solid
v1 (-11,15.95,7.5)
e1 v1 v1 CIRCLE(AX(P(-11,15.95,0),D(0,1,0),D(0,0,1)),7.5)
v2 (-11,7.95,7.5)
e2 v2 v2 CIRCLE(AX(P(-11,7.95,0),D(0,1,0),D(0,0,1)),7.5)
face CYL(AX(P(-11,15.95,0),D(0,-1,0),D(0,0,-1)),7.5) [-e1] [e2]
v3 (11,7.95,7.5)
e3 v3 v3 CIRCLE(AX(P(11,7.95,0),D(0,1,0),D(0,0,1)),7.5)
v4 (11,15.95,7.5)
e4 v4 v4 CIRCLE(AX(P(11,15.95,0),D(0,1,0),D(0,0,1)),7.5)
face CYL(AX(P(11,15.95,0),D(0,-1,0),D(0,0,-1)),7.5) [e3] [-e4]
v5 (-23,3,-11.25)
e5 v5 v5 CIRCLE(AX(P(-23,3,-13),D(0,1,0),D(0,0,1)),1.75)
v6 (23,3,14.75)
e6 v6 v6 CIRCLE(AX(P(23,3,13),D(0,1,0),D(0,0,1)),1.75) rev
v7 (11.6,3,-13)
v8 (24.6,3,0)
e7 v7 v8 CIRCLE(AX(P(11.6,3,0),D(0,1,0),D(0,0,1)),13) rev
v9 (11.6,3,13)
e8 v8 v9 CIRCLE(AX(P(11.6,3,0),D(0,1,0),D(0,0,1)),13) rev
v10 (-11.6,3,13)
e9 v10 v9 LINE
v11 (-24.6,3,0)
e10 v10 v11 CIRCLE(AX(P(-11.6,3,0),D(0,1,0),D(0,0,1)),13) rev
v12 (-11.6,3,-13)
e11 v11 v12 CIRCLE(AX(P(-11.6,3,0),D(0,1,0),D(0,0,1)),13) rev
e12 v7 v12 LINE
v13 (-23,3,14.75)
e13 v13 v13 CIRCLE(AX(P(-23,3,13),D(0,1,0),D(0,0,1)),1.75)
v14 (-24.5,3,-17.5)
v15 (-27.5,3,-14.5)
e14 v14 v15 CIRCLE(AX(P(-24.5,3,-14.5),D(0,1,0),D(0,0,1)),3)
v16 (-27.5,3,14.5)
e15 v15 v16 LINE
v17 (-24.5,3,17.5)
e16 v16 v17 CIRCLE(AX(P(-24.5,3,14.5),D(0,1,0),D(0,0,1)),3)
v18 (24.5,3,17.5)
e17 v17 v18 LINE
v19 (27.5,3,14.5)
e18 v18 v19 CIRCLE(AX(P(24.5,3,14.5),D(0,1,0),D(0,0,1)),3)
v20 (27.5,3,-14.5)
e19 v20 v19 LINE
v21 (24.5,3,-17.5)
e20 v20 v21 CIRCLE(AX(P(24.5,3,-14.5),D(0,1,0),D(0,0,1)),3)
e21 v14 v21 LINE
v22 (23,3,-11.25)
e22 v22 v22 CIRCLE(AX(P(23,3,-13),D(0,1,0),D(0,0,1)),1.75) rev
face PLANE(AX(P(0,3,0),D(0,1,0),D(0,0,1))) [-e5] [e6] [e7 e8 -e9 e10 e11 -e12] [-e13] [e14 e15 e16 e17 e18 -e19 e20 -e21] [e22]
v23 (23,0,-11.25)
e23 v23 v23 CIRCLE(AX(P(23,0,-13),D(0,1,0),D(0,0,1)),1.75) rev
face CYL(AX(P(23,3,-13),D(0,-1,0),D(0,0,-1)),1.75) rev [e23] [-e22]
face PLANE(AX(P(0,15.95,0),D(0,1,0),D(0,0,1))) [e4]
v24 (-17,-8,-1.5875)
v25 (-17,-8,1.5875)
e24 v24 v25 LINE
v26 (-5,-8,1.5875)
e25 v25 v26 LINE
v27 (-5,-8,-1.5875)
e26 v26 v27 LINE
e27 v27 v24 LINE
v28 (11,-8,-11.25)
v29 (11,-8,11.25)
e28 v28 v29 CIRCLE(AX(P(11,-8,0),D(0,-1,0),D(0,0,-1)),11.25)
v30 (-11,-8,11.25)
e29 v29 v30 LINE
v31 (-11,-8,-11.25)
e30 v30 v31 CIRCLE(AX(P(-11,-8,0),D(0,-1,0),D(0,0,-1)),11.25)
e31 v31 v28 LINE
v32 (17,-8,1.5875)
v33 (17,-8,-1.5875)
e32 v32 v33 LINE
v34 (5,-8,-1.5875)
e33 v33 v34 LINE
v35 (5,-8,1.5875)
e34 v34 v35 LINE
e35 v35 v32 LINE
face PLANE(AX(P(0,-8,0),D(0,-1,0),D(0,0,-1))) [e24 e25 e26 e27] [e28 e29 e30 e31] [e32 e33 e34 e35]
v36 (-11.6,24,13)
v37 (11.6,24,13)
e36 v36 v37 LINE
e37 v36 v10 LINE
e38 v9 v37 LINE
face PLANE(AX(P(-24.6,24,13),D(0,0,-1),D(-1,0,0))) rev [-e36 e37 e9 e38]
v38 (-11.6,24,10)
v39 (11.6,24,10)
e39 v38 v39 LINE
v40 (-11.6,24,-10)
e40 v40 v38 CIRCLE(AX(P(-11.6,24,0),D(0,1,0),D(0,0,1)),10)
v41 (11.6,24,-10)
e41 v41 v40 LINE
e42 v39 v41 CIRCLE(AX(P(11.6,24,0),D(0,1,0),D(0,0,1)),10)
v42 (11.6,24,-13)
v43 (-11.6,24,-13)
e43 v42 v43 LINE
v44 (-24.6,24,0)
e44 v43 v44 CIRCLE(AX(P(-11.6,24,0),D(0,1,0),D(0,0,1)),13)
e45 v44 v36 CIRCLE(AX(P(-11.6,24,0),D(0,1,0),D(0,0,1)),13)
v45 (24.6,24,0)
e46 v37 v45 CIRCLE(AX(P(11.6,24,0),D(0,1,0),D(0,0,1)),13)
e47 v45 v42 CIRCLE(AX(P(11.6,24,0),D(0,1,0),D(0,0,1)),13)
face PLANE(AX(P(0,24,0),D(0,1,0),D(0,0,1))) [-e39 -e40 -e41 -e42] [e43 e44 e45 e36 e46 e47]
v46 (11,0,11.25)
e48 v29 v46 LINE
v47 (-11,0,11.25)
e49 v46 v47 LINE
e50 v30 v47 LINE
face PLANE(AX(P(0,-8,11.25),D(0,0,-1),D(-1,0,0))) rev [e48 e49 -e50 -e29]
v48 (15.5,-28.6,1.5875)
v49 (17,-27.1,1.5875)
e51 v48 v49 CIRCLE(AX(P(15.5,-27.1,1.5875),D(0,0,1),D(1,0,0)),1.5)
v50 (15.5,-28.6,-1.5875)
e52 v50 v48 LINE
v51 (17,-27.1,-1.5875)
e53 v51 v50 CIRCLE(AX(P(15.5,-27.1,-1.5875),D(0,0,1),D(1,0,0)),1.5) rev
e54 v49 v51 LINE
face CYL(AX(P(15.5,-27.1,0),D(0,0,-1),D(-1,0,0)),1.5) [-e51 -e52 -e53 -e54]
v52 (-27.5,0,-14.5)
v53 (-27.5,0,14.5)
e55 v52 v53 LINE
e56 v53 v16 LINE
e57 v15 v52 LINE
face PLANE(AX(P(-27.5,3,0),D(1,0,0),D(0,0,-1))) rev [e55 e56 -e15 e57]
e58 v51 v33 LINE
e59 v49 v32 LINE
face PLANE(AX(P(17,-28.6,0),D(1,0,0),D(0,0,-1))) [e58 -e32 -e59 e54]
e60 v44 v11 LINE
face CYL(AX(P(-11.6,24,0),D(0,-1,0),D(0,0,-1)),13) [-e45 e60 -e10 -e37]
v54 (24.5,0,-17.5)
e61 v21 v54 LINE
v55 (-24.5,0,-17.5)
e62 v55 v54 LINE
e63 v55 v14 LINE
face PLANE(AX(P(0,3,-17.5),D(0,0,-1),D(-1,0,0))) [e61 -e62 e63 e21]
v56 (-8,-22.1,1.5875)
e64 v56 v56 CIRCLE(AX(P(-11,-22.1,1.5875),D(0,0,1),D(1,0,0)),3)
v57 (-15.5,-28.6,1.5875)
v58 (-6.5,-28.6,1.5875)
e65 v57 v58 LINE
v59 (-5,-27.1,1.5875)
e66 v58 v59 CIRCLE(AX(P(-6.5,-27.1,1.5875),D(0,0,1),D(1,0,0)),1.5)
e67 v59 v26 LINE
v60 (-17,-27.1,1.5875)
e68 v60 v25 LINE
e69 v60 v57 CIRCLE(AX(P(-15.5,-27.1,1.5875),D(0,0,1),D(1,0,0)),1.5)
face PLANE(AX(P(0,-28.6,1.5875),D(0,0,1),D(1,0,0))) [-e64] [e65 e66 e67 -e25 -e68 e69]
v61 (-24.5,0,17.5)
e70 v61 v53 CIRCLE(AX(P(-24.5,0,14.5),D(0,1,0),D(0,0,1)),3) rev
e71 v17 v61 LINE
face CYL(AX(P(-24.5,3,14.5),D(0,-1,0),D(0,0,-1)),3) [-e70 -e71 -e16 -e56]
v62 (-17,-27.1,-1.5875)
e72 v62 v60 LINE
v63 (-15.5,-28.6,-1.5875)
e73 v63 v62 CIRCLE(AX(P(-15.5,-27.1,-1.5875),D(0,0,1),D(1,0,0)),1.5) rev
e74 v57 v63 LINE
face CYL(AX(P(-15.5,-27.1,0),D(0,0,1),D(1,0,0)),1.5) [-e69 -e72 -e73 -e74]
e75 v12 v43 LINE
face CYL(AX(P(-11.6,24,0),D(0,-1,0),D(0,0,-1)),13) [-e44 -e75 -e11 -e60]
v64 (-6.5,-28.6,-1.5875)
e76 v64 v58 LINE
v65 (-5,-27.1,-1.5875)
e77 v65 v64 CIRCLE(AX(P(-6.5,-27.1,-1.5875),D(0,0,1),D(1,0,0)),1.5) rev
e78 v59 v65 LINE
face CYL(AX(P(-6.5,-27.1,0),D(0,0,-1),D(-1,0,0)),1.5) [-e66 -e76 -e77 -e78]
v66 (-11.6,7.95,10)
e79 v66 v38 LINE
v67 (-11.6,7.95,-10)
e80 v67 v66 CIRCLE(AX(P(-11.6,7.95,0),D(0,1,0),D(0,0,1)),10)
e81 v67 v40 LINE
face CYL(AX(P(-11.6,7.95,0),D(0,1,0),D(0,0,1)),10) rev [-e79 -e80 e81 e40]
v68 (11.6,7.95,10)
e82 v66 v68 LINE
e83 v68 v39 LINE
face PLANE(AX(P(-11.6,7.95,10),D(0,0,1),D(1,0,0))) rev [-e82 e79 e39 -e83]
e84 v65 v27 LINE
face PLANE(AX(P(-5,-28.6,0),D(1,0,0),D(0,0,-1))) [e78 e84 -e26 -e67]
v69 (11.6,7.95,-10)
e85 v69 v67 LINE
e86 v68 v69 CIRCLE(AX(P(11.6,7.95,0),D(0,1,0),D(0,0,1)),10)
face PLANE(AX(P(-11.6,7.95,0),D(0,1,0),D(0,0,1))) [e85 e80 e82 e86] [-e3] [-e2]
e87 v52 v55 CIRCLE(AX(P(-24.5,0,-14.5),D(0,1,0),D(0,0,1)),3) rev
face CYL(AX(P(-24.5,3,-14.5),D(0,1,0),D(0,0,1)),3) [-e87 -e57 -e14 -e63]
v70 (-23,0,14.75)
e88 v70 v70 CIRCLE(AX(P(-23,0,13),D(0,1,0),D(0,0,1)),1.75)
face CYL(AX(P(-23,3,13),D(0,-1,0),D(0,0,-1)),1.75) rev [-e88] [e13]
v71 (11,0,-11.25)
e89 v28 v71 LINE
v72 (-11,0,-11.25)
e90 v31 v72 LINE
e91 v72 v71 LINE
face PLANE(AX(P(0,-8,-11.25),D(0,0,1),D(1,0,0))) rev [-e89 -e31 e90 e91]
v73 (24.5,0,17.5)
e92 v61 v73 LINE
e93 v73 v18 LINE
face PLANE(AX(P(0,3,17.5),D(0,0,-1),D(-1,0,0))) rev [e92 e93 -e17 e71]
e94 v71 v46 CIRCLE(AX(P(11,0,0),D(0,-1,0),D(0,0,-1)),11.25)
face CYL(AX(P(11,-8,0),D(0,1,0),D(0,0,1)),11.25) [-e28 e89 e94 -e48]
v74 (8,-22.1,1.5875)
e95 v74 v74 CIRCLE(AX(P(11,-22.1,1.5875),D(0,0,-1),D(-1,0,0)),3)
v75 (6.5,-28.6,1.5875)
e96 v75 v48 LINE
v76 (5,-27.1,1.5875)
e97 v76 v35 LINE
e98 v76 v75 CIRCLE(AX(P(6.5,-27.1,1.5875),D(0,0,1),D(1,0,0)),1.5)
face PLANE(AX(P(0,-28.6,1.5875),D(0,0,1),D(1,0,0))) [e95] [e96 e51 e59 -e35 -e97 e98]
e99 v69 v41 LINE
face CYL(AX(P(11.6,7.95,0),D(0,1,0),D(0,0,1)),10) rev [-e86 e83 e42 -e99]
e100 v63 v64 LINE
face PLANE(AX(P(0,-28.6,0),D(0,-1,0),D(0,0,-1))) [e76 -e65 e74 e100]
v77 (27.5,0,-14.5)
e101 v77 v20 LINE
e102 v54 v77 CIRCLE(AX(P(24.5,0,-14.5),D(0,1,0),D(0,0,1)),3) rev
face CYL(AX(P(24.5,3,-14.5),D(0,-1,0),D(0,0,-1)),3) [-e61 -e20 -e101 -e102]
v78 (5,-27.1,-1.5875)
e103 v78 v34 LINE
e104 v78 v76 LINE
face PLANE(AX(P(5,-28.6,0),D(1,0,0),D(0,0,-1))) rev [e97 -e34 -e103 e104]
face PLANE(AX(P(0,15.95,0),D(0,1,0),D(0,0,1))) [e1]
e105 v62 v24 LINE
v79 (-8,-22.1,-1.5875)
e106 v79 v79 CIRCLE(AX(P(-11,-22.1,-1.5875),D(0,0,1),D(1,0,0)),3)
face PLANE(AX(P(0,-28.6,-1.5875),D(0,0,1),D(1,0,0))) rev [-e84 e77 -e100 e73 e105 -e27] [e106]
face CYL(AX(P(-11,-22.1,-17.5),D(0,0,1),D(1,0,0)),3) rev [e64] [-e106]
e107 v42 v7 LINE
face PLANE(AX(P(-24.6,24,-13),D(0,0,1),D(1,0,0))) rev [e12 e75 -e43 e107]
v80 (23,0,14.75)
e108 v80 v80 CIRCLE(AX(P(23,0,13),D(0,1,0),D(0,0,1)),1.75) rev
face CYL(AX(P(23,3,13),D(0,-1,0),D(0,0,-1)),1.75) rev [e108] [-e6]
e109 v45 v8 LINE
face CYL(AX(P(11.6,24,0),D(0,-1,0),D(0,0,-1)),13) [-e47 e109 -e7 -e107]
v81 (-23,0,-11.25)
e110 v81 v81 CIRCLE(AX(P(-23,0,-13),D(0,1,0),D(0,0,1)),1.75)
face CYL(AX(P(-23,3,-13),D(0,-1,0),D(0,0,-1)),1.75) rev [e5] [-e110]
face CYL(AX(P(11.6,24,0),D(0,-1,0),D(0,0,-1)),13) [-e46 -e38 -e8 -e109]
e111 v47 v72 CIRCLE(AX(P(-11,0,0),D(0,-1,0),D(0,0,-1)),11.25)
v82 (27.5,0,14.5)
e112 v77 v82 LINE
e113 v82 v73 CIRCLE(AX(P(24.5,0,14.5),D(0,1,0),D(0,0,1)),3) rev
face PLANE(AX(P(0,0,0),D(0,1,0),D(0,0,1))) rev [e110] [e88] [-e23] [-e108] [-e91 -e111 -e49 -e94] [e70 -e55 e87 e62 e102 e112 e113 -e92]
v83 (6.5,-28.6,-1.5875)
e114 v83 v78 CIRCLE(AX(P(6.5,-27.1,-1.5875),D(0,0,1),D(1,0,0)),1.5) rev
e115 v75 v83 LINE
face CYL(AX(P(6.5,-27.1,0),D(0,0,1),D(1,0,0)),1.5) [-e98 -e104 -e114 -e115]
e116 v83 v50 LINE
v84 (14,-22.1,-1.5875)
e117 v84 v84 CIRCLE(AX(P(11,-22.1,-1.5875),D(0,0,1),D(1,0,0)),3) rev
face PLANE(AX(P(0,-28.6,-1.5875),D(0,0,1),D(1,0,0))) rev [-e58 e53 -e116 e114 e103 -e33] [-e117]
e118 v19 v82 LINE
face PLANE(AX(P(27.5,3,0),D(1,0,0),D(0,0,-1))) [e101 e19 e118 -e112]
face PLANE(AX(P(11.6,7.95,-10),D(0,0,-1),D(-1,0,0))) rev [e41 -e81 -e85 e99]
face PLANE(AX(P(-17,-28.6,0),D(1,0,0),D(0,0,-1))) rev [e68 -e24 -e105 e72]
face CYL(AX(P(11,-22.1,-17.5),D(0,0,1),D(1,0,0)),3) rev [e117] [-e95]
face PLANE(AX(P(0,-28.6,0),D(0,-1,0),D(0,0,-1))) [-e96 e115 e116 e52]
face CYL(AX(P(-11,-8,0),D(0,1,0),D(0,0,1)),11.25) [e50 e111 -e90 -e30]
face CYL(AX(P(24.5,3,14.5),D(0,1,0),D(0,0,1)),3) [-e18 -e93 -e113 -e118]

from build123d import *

# Parameters (mm, degrees)
SKETCH1_W           = 55
SKETCH1_H           = 35
SKETCH1_R           = 1.75
BOSS_EXTRUDE1_DEPTH = 3
FILLET1_R           = 3
SKETCH2_W           = 49.2
SKETCH2_H           = 26
BOSS_EXTRUDE2_DEPTH = 21
FILLET2_R           = 13
BOSS_EXTRUDE3_DEPTH = 28.6
SKETCH4_R           = 3
CUT_EXTRUDE1_DEPTH  = 45.02888434
CUT_EXTRUDE2_DEPTH  = 16.05
SKETCH6_R           = 11.25
BOSS_EXTRUDE4_DEPTH = 8
SKETCH7_R           = 7.5
BOSS_EXTRUDE5_DEPTH = 8
FILLET3_R           = 1.5


with BuildPart() as part:
    # Sketch1 → Boss-Extrude1 (new body)
    with BuildSketch(Plane(origin=(0, 0, 0), x_dir=(1, 0, 0), z_dir=(0, 1, 0))):
        Rectangle(SKETCH1_W, SKETCH1_H)
        with Locations(Location((-23, 13, 0), (0, 0, 270))):
            Circle(SKETCH1_R, mode=Mode.SUBTRACT)
        with Locations(Location((-23, -13, 0), (0, 0, 270))):
            Circle(SKETCH1_R, mode=Mode.SUBTRACT)
        with Locations(Location((23, -13, 0), (0, 0, 270))):
            Circle(SKETCH1_R, mode=Mode.SUBTRACT)
        with Locations(Location((23, 13, 0), (0, 0, 270))):
            Circle(SKETCH1_R, mode=Mode.SUBTRACT)
    extrude(amount=BOSS_EXTRUDE1_DEPTH)

    # Fillet1
    fillet1_edges = [part.edges().sort_by_distance(p)[0] for p in [
        (27.5, 1.5, 17.5),
        (-27.5, 1.5, 17.5),
        (-27.5, 1.5, -17.5),
        (27.5, 1.5, -17.5),
    ]]
    fillet(fillet1_edges, radius=FILLET1_R)

    # Sketch2 → Boss-Extrude2 (add)
    with BuildSketch(Plane(origin=(0, 3, 0), x_dir=(1, 0, 0), z_dir=(0, 1, 0))):
        Rectangle(SKETCH2_W, SKETCH2_H)
    extrude(amount=BOSS_EXTRUDE2_DEPTH)

    # Fillet2
    # the kernel refuses this fillet: 13 mm, written as the material it takes off along each edge
    with BuildSketch(Plane(origin=(-24.6, 3, 13), x_dir=(1, 0, 0), z_dir=(0, 1, 0)), Plane(origin=(24.6, 3, -13), x_dir=(-1, 0, 0), z_dir=(0, 1, 0)), Plane(origin=(24.6, 3, 13), x_dir=(0, 0, -1), z_dir=(0, 1, 0))) as fillet2_piece_1:
        with BuildLine():
            CenterArc((FILLET2_R, FILLET2_R), FILLET2_R, 180, 90)
            Line((0, FILLET2_R), (0, 0))
            Line((0, 0), (FILLET2_R, 0))
        make_face()
    extrude(amount=53.5, mode=Mode.SUBTRACT)
    with BuildSketch(Plane(origin=(-24.6, 3, -13), x_dir=(1, 0, 0), z_dir=(0, 1, 0))) as fillet2_piece_2:
        with BuildLine():
            CenterArc((FILLET2_R, -FILLET2_R), FILLET2_R, 90, 90)
            Line((0, -FILLET2_R), (0, 0))
            Line((0, 0), (FILLET2_R, 0))
        make_face()
    extrude(amount=53.5, mode=Mode.SUBTRACT)

    # Sketch3 → Boss-Extrude3 (add)
    with BuildSketch(Plane.XZ):
        Polygon((-11, 0), (-17, 0), (-17, -1.5875), (-5, -1.5875), (-5, 0), align=None)
        Polygon((-17, 1.5875), (-17, 0), (-11, 0), (-5, 0), (-5, 1.5875), align=None)
        Polygon((5, 1.5875), (5, 0), (11, 0), (17, 0), (17, 1.5875), align=None)
        Polygon((11, 0), (5, 0), (5, -1.5875), (17, -1.5875), (17, 0), align=None)
    extrude(amount=BOSS_EXTRUDE3_DEPTH)

    # Sketch4 → Cut-Extrude1 (cut, through all)
    with BuildSketch(Plane.XY.offset(1.5875)):
        with Locations((-11, -22.1)):
            Circle(SKETCH4_R)
    cut_extrude1 = extrude(amount=-CUT_EXTRUDE1_DEPTH, mode=Mode.SUBTRACT)

    # Mirror1: Cut-Extrude1 across plane
    add(cut_extrude1.mirror(Plane(origin=(0, 0, 0), x_dir=(0, 0, 1), z_dir=(1, 0, 0))), mode=Mode.SUBTRACT)

    # Sketch5 → Cut-Extrude2 (cut)
    with BuildSketch(Plane(origin=(0, 24, 0), x_dir=(1, 0, 0), z_dir=(0, 1, 0))):
        with BuildLine():
            Line((-11.6, -10), (11.6, -10))
            ThreePointArc((11.6, -10), (18.671067812, -7.071067812), (21.6, 0))
            ThreePointArc((21.6, 0), (18.671067812, 7.071067812), (11.6, 10))
            Line((11.6, 10), (-11.6, 10))
            ThreePointArc((-11.6, 10), (-18.671067812, 7.071067812), (-21.6, 0))
            ThreePointArc((-21.6, 0), (-18.671067812, -7.071067812), (-11.6, -10))
        make_face()
    extrude(amount=-CUT_EXTRUDE2_DEPTH, mode=Mode.SUBTRACT)

    # Sketch6 → Boss-Extrude4 (add)
    with BuildSketch(Plane.XZ):
        with BuildLine():
            Line((-11, 1.5875), (-11, 11.25))
            ThreePointArc((-11, 11.25), (-22.25, 0), (-11, -11.25))
            Line((-11, -11.25), (-11, -1.5875))
            Line((-11, -1.5875), (-17, -1.5875))
            Line((-17, -1.5875), (-17, 1.5875))
            Line((-17, 1.5875), (-11, 1.5875))
        make_face()
        with BuildLine():
            ThreePointArc((0, 2.358495283), (-3.927891825, 8.749159158), (-11, 11.25))
            Line((-11, 11.25), (-11, 1.5875))
            Line((-11, 1.5875), (-5, 1.5875))
            Line((-5, 1.5875), (-5, -1.5875))
            Line((-5, -1.5875), (-11, -1.5875))
            Line((-11, -1.5875), (-11, -11.25))
            ThreePointArc((-11, -11.25), (-3.927891825, -8.749159158), (0, -2.358495283))
            ThreePointArc((0, -2.358495283), (-0.25, 0), (0, 2.358495283))
        make_face()
        with BuildLine():
            Line((11, 1.5875), (11, 11.25))
            ThreePointArc((11, 11.25), (3.927891825, 8.749159158), (0, 2.358495283))
            ThreePointArc((0, 2.358495283), (0.187325418, 1.185854123), (0.25, 0))
            ThreePointArc((0.25, 0), (0.187325418, -1.185854123), (0, -2.358495283))
            ThreePointArc((0, -2.358495283), (3.927891825, -8.749159158), (11, -11.25))
            Line((11, -11.25), (11, -1.5875))
            Line((11, -1.5875), (5, -1.5875))
            Line((5, -1.5875), (5, 1.5875))
            Line((5, 1.5875), (11, 1.5875))
        make_face()
        with BuildLine():
            ThreePointArc((22.25, 0), (18.954951288, 7.954951288), (11, 11.25))
            Line((11, 11.25), (11, 1.5875))
            Line((11, 1.5875), (17, 1.5875))
            Line((17, 1.5875), (17, -1.5875))
            Line((17, -1.5875), (11, -1.5875))
            Line((11, -1.5875), (11, -11.25))
            ThreePointArc((11, -11.25), (18.954951288, -7.954951288), (22.25, 0))
        make_face()
        with BuildLine():
            ThreePointArc((0, 2.358495283), (3.927891825, 8.749159158), (11, 11.25))
            Line((11, 11.25), (-11, 11.25))
            ThreePointArc((-11, 11.25), (-3.927891825, 8.749159158), (0, 2.358495283))
        make_face()
        with BuildLine():
            ThreePointArc((0, -2.358495283), (-3.927891825, -8.749159158), (-11, -11.25))
            Line((-11, -11.25), (11, -11.25))
            ThreePointArc((11, -11.25), (3.927891825, -8.749159158), (0, -2.358495283))
        make_face()
        with Locations((11, 0)):
            Circle(SKETCH6_R)
        with Locations((-11, 0)):
            Circle(SKETCH6_R)
    extrude(amount=BOSS_EXTRUDE4_DEPTH)

    # Sketch7 → Boss-Extrude5 (add)
    with BuildSketch(Plane(origin=(0, 7.95, 0), x_dir=(1, 0, 0), z_dir=(0, 1, 0))):
        with Locations(Location((-11, 0, 0), (0, 0, 270))):
            Circle(SKETCH7_R)
        with Locations(Location((11, 0, 0), (0, 0, 270))):
            Circle(SKETCH7_R)
    extrude(amount=BOSS_EXTRUDE5_DEPTH)

    # Fillet3
    fillet3_edges = [part.edges().sort_by_distance(p)[0] for p in [
        (-5, -28.6, 0),
        (-17, -28.6, 0),
        (17, -28.6, 0),
        (5, -28.6, 0),
    ]]
    fillet(fillet3_edges, radius=FILLET3_R)


solid = part.part
